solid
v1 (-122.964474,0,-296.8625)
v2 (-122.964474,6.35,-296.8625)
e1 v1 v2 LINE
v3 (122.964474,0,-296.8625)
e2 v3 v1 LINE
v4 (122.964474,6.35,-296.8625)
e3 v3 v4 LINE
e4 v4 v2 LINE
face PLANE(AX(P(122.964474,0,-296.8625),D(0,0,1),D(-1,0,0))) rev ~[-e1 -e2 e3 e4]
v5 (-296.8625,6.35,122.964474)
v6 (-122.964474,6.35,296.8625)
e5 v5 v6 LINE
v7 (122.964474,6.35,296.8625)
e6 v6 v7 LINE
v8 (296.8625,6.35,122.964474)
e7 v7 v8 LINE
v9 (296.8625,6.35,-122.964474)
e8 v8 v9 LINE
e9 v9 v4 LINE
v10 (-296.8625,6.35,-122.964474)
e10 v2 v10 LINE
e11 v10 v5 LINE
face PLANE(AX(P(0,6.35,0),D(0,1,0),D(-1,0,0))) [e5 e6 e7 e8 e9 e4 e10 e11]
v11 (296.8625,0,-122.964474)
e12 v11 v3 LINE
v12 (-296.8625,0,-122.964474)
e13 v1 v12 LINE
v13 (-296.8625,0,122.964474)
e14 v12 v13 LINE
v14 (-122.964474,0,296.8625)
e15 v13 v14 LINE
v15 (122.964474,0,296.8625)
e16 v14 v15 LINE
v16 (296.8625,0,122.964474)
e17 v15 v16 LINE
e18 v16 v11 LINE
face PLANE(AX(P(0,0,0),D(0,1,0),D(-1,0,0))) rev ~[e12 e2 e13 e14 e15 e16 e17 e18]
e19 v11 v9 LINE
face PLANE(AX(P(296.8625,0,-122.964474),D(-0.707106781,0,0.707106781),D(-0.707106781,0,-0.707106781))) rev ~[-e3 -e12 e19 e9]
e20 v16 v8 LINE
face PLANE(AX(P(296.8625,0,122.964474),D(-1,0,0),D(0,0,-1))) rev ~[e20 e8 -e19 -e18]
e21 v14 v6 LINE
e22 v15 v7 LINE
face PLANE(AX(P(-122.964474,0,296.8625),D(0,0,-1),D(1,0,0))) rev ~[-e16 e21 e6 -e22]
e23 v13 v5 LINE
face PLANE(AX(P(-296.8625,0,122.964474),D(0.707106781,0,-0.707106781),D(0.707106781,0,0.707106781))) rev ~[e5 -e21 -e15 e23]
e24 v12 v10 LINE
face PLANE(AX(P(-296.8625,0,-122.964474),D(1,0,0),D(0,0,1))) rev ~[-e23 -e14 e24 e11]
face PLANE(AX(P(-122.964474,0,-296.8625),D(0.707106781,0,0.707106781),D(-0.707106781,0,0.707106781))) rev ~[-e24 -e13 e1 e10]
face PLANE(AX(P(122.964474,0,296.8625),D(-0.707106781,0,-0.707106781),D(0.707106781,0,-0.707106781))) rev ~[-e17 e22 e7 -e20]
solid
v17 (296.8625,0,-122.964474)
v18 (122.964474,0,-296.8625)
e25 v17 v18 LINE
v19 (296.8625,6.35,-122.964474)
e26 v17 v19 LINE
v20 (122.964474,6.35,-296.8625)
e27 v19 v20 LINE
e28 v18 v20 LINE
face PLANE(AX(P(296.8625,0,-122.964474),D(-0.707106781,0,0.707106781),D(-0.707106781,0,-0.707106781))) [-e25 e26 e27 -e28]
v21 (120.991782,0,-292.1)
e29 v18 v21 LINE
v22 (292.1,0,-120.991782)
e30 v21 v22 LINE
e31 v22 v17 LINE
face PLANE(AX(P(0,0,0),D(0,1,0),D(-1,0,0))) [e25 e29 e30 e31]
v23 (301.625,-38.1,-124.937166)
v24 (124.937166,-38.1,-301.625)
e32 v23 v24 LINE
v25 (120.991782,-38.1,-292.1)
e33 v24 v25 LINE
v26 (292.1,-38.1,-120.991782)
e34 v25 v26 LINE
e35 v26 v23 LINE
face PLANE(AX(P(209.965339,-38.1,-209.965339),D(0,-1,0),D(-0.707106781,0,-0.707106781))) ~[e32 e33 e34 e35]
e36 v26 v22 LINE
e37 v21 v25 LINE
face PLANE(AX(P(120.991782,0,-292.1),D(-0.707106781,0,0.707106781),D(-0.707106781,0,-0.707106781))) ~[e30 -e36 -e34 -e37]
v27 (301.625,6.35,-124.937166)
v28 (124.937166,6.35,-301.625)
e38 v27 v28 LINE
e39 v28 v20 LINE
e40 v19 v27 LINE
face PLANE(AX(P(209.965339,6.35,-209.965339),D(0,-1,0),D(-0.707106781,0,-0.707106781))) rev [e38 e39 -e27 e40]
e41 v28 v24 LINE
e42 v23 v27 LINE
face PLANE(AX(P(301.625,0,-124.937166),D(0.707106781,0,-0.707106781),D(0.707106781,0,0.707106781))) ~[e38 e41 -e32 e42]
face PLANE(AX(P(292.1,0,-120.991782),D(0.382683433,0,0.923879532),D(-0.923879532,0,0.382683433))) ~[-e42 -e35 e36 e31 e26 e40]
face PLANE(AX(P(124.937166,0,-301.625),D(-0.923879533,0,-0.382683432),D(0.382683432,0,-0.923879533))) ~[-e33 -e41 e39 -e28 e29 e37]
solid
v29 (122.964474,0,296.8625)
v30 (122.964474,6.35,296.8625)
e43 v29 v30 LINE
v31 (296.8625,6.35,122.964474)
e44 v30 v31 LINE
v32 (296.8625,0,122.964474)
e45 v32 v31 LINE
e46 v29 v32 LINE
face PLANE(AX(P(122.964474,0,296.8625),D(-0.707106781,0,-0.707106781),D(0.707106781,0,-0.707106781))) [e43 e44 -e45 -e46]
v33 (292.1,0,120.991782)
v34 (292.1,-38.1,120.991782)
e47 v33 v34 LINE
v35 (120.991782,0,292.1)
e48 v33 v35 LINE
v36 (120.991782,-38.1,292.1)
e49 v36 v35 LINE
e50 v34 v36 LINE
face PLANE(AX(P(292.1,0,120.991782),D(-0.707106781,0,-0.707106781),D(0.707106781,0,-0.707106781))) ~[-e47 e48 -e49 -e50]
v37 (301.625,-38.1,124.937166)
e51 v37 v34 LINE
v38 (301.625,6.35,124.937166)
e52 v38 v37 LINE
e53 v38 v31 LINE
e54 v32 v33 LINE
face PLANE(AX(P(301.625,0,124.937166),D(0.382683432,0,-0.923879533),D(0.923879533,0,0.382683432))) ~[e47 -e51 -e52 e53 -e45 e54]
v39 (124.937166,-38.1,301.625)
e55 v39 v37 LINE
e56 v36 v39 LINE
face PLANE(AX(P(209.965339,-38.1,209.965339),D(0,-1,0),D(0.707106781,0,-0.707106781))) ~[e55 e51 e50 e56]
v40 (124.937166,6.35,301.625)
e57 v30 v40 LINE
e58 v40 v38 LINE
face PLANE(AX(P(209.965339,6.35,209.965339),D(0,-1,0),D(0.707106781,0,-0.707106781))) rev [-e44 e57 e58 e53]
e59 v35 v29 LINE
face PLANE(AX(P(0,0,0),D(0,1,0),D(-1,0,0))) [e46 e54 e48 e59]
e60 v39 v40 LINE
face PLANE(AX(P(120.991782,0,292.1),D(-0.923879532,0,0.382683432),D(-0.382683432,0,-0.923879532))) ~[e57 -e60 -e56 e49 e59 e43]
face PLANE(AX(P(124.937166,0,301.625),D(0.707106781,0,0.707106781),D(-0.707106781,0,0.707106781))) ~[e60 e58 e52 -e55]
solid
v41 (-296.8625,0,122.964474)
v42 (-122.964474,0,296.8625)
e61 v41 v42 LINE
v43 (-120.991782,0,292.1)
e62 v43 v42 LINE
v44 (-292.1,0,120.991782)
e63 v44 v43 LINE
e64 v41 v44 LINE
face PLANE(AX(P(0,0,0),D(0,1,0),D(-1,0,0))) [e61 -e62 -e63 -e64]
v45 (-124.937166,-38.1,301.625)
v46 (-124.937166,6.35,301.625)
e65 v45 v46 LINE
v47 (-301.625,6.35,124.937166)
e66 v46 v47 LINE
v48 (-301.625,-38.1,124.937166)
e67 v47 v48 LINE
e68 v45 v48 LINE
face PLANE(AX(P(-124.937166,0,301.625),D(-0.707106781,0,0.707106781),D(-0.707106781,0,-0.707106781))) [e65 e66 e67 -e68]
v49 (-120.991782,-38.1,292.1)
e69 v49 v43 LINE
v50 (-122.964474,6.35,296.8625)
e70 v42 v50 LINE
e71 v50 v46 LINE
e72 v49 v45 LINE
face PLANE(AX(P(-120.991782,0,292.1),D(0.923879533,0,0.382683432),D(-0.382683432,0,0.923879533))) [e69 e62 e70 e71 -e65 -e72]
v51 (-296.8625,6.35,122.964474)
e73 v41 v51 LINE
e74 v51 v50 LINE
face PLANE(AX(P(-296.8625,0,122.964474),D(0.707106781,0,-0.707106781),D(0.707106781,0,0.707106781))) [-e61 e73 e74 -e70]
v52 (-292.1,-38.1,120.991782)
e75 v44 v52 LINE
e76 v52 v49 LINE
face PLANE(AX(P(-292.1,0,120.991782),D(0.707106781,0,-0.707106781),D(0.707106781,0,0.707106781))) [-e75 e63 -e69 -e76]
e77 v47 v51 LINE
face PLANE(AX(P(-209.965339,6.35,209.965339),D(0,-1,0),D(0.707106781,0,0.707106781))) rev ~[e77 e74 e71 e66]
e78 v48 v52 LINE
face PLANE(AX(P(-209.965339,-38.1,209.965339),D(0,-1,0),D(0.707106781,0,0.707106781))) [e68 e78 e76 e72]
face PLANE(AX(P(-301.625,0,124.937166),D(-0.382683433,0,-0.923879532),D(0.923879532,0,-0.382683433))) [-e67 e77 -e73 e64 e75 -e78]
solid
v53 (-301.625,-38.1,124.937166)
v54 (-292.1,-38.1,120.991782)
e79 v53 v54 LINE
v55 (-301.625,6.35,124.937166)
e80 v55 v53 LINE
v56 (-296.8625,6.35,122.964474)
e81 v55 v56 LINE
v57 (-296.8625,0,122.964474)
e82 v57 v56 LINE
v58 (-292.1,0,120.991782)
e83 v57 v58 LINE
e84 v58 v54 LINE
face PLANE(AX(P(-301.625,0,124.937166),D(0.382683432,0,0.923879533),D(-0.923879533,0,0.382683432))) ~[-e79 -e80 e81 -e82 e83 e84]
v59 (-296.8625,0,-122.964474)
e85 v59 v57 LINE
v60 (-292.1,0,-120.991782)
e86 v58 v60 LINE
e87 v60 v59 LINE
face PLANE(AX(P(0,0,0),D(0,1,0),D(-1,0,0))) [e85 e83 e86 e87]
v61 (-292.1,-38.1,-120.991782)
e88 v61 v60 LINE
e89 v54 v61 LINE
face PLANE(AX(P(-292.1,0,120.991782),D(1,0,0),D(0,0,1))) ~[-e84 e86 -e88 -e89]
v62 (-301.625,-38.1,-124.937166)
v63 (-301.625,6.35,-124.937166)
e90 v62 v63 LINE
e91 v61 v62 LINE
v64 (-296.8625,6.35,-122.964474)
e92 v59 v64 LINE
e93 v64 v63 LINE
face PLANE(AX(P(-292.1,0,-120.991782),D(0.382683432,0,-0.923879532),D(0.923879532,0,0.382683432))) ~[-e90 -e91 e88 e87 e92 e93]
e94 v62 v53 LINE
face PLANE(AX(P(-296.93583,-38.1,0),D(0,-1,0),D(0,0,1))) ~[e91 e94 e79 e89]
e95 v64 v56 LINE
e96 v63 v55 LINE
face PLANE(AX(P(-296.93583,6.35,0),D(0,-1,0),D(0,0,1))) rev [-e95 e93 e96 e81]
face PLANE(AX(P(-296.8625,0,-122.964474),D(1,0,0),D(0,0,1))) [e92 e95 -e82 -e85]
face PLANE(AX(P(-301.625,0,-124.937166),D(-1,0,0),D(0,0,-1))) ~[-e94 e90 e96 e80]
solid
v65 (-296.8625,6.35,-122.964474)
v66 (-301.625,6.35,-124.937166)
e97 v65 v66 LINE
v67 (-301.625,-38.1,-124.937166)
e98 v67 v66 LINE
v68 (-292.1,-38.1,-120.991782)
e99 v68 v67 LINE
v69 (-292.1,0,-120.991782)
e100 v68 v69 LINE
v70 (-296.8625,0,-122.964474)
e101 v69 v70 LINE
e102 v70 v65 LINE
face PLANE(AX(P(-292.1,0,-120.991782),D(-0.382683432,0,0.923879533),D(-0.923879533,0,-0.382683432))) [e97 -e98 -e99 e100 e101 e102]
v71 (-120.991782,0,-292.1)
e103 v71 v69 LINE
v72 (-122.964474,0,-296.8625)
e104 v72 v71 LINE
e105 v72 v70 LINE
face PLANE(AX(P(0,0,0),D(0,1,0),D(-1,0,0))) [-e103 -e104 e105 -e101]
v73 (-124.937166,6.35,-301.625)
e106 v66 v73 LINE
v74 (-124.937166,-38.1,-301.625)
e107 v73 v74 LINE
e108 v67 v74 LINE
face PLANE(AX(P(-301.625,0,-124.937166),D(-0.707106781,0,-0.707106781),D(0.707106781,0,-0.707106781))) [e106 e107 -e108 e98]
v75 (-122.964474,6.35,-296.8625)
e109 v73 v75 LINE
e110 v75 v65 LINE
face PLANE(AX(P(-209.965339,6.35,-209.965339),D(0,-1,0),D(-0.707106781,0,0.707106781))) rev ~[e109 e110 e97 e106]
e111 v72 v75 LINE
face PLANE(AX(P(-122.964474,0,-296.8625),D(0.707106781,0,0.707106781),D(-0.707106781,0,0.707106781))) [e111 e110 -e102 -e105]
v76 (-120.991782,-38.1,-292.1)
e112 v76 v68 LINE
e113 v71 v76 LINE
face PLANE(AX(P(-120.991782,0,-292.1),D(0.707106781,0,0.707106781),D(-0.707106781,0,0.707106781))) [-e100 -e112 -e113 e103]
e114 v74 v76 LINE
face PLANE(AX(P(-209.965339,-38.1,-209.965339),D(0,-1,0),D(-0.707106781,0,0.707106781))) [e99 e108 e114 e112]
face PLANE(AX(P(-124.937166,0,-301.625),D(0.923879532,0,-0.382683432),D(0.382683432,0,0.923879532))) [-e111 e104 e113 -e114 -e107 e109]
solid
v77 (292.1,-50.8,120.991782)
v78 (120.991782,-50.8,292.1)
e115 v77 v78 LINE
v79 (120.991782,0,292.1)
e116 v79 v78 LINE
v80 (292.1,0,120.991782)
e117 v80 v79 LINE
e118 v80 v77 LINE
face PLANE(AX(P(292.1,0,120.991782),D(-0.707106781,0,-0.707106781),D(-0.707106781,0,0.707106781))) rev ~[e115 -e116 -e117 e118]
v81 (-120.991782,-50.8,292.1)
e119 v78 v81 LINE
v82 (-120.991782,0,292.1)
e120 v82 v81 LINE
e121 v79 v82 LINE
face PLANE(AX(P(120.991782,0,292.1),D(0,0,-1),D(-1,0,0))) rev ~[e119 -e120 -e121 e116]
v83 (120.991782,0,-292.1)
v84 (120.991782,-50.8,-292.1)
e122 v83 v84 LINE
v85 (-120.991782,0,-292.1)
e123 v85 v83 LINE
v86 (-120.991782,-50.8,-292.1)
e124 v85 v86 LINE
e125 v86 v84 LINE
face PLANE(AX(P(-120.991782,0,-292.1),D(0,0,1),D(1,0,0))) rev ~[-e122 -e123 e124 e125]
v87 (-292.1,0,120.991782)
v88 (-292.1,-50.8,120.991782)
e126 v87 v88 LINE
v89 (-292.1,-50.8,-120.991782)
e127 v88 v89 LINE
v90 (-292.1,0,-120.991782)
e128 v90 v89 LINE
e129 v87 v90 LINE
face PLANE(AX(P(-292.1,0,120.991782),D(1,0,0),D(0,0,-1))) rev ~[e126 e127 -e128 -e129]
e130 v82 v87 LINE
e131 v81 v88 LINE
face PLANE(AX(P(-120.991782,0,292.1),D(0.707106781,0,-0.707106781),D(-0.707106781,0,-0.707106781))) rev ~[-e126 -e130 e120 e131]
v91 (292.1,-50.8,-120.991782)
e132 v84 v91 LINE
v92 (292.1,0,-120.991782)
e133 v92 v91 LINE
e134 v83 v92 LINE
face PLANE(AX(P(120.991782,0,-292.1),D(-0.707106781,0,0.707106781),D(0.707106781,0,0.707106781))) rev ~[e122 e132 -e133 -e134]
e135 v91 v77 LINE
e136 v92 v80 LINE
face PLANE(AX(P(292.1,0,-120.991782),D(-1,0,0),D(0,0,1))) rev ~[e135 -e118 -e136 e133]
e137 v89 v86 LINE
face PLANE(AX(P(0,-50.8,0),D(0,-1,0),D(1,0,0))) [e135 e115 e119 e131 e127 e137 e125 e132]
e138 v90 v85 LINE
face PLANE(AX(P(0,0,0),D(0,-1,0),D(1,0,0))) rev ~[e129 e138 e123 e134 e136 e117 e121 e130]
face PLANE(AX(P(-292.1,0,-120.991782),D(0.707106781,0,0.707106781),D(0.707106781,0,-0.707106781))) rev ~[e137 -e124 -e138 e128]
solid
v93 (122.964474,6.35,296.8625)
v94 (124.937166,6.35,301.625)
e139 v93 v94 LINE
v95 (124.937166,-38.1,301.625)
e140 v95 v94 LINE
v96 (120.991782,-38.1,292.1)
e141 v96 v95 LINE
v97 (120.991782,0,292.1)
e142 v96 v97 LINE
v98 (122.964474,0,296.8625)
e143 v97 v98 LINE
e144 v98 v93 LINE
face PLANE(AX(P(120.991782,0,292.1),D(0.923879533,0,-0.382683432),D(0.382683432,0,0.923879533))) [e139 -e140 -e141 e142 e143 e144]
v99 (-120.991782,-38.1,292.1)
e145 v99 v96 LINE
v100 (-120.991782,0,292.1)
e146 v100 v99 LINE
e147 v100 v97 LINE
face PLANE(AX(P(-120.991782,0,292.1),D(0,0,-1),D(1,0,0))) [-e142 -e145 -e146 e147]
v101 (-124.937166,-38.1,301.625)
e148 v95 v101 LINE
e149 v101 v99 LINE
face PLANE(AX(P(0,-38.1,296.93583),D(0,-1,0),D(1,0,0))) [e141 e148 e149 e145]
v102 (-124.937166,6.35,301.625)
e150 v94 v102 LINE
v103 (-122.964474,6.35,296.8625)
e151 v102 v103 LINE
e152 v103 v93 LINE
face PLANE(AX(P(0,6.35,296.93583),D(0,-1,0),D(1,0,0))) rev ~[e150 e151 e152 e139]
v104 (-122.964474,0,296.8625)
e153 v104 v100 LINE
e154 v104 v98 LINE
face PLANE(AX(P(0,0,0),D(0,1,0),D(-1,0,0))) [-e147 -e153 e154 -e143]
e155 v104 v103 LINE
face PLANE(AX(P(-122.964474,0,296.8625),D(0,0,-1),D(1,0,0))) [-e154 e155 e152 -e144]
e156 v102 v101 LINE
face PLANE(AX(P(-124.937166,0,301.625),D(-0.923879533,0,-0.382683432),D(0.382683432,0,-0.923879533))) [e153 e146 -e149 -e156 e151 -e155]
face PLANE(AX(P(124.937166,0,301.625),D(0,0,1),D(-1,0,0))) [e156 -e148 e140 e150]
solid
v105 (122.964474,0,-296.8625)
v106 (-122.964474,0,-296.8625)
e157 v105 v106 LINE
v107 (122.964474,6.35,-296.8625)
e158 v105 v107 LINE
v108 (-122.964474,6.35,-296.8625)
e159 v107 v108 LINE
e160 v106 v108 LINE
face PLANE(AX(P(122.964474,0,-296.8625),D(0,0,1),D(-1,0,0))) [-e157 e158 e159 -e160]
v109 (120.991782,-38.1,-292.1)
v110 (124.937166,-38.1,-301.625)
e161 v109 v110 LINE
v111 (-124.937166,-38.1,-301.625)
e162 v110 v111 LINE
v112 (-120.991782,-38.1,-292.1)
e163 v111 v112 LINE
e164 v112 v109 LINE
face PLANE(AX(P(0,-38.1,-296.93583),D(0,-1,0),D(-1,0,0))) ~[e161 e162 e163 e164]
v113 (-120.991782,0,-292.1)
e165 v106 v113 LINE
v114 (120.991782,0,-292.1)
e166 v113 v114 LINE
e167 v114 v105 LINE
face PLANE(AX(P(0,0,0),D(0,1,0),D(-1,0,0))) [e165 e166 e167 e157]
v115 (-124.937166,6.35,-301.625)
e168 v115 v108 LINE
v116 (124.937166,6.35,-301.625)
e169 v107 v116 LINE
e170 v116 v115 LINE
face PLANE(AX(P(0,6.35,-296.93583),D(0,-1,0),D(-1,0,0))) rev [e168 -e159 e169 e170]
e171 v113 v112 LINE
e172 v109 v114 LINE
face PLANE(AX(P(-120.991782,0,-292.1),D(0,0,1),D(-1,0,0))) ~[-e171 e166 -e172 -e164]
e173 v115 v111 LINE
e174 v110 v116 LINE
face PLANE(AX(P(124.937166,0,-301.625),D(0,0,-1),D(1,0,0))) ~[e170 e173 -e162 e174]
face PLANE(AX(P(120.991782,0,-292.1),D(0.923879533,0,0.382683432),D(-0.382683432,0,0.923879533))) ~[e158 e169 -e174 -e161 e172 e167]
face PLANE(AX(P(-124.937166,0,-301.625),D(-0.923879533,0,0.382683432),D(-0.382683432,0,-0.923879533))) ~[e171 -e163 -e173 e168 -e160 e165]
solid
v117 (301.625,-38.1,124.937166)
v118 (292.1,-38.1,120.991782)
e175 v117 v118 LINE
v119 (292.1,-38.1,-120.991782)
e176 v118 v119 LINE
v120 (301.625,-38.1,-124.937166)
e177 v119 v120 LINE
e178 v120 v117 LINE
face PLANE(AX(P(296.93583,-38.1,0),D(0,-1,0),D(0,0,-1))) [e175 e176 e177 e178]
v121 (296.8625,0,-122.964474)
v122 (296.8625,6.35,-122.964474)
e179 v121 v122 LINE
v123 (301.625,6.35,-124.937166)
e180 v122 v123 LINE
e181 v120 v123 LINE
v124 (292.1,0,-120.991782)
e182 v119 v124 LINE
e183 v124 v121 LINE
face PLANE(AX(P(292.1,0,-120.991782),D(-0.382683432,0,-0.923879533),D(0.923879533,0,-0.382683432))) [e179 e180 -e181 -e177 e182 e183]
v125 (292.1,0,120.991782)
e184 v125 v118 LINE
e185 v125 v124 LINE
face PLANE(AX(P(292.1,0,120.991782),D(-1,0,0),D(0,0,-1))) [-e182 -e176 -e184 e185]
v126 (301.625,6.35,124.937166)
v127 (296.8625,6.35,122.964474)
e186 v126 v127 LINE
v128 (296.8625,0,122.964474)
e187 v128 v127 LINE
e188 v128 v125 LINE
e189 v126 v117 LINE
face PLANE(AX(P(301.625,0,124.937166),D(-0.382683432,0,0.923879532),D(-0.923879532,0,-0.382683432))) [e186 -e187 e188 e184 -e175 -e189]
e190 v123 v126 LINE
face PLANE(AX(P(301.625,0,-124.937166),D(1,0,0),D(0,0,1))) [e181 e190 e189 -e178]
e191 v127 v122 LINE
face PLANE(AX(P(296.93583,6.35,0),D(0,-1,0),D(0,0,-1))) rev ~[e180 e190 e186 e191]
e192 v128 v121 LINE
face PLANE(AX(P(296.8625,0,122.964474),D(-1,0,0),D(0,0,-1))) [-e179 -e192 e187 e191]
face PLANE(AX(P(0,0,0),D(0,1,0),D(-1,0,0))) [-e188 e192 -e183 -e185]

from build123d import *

# Parameters (mm, degrees)
F2_DEPTH      = 50.8
F5_DEPTH      = 38.1
F5_DEPTH_BACK = 6.35
F14_DEPTH     = 6.35


# Not quite as in the source:
# - a variable given as a bare number and used for a length is read in inches; the dataset says mm whatever the document's units were
# - a length typed as a fraction of an inch, garbled in the dataset ("3 / 203.2 mm" for 3/8 in), is restored


with BuildPart() as f2:
    # F1 (on Front) → F2 (new body)
    with BuildSketch(Plane.XZ):
        Polygon((292.0999999997, -120.9917815691), (292.0999999997, 120.9917815691), (120.9917815691, 292.0999999997), (-120.9917815691, 292.0999999997), (-292.0999999997, 120.9917815691), (-292.0999999997, -120.9917815691), (-120.9917815691, -292.0999999997), (120.9917815691, -292.0999999997), align=None)
    extrude(amount=F2_DEPTH)


with BuildPart() as f5:
    # F4 (on Front) → F5 (new body, two sides)
    with BuildSketch(Plane.XZ) as f5_sk:
        Polygon((124.9371657507, 301.6249999997), (-124.9371657507, 301.6249999997), (-120.9917815691, 292.0999999997), (120.9917815691, 292.0999999997), align=None)
    extrude(amount=F5_DEPTH)
    extrude(f5_sk.sketch, amount=-F5_DEPTH_BACK)


with BuildPart() as f6_1:
    # F6: instance of F5
    add(f5.part.mirror(Plane.XY))


with BuildPart() as f7_1:
    # F7: instance of F5
    add(f5.part.mirror(Plane(origin=(122.9644736599, -15.875, 296.8624999997), x_dir=(0, 1, 0), z_dir=(0.9238795325, 0, -0.3826834324))))


with BuildPart() as f8_1:
    # F8: instance of F7_1
    add(f7_1.part.mirror(Plane(origin=(296.8624999997, -15.875, 122.9644736599), x_dir=(1, 0, 0), z_dir=(0.3826834324, 0, -0.9238795325))))


with BuildPart() as f9_1:
    # F9: instance of F8_1
    add(f8_1.part.mirror(Plane(origin=(296.8624999997, -15.875, -122.9644736599), x_dir=(1, 0, 0), z_dir=(-0.3826834324, 0, -0.9238795325))))


with BuildPart() as f10_1:
    # F10: instance of F6_1
    add(f6_1.part.mirror(Plane(origin=(-122.9644736599, -15.875, -296.8624999997), x_dir=(0, -1, 0), z_dir=(-0.9238795325, 0, 0.3826834324))))


with BuildPart() as f11_1:
    # F11: instance of F10_1
    add(f10_1.part.mirror(Plane(origin=(-296.8624999997, -15.875, -122.9644736599), x_dir=(1, 0, 0), z_dir=(-0.3826834324, 0, 0.9238795325))))


with BuildPart() as f12_1:
    # F12: instance of F11_1
    add(f11_1.part.mirror(Plane(origin=(-296.8624999997, -15.875, 122.9644736599), x_dir=(1, 0, 0), z_dir=(0.3826834324, 0, 0.9238795325))))


with BuildPart() as f14:
    # F13 (on face) → F14 (new body)
    with BuildSketch(Plane(origin=(0, 0, 0), x_dir=(-1, 0, 0), z_dir=(0, 1, 0))):
        Polygon((-122.9644736599, -296.8624999997), (122.9644736599, -296.8624999997), (296.8624999997, -122.9644736599), (296.8624999997, 122.9644736599), (122.9644736599, 296.8624999997), (-122.9644736599, 296.8624999997), (-296.8624999997, 122.9644736599), (-296.8624999997, -122.9644736599), align=None)
    extrude(amount=F14_DEPTH)


with BuildPart() as f5_1:
    add(f5.part)

    # F15: cut F14
    add(f14.part, mode=Mode.SUBTRACT)


with BuildPart() as f6_1_1:
    add(f6_1.part)

    # F15: cut F14
    add(f14.part, mode=Mode.SUBTRACT)


with BuildPart() as f7_1_1:
    add(f7_1.part)

    # F15: cut F14
    add(f14.part, mode=Mode.SUBTRACT)


with BuildPart() as f8_1_1:
    add(f8_1.part)

    # F15: cut F14
    add(f14.part, mode=Mode.SUBTRACT)


with BuildPart() as f9_1_1:
    add(f9_1.part)

    # F15: cut F14
    add(f14.part, mode=Mode.SUBTRACT)


with BuildPart() as f10_1_1:
    add(f10_1.part)

    # F15: cut F14
    add(f14.part, mode=Mode.SUBTRACT)


with BuildPart() as f11_1_1:
    add(f11_1.part)

    # F15: cut F14
    add(f14.part, mode=Mode.SUBTRACT)


with BuildPart() as f12_1_1:
    add(f12_1.part)

    # F15: cut F14
    add(f14.part, mode=Mode.SUBTRACT)


solid = Compound([f2.part, f14.part, f5_1.part, f6_1_1.part, f7_1_1.part, f8_1_1.part, f9_1_1.part, f10_1_1.part, f11_1_1.part, f12_1_1.part])
